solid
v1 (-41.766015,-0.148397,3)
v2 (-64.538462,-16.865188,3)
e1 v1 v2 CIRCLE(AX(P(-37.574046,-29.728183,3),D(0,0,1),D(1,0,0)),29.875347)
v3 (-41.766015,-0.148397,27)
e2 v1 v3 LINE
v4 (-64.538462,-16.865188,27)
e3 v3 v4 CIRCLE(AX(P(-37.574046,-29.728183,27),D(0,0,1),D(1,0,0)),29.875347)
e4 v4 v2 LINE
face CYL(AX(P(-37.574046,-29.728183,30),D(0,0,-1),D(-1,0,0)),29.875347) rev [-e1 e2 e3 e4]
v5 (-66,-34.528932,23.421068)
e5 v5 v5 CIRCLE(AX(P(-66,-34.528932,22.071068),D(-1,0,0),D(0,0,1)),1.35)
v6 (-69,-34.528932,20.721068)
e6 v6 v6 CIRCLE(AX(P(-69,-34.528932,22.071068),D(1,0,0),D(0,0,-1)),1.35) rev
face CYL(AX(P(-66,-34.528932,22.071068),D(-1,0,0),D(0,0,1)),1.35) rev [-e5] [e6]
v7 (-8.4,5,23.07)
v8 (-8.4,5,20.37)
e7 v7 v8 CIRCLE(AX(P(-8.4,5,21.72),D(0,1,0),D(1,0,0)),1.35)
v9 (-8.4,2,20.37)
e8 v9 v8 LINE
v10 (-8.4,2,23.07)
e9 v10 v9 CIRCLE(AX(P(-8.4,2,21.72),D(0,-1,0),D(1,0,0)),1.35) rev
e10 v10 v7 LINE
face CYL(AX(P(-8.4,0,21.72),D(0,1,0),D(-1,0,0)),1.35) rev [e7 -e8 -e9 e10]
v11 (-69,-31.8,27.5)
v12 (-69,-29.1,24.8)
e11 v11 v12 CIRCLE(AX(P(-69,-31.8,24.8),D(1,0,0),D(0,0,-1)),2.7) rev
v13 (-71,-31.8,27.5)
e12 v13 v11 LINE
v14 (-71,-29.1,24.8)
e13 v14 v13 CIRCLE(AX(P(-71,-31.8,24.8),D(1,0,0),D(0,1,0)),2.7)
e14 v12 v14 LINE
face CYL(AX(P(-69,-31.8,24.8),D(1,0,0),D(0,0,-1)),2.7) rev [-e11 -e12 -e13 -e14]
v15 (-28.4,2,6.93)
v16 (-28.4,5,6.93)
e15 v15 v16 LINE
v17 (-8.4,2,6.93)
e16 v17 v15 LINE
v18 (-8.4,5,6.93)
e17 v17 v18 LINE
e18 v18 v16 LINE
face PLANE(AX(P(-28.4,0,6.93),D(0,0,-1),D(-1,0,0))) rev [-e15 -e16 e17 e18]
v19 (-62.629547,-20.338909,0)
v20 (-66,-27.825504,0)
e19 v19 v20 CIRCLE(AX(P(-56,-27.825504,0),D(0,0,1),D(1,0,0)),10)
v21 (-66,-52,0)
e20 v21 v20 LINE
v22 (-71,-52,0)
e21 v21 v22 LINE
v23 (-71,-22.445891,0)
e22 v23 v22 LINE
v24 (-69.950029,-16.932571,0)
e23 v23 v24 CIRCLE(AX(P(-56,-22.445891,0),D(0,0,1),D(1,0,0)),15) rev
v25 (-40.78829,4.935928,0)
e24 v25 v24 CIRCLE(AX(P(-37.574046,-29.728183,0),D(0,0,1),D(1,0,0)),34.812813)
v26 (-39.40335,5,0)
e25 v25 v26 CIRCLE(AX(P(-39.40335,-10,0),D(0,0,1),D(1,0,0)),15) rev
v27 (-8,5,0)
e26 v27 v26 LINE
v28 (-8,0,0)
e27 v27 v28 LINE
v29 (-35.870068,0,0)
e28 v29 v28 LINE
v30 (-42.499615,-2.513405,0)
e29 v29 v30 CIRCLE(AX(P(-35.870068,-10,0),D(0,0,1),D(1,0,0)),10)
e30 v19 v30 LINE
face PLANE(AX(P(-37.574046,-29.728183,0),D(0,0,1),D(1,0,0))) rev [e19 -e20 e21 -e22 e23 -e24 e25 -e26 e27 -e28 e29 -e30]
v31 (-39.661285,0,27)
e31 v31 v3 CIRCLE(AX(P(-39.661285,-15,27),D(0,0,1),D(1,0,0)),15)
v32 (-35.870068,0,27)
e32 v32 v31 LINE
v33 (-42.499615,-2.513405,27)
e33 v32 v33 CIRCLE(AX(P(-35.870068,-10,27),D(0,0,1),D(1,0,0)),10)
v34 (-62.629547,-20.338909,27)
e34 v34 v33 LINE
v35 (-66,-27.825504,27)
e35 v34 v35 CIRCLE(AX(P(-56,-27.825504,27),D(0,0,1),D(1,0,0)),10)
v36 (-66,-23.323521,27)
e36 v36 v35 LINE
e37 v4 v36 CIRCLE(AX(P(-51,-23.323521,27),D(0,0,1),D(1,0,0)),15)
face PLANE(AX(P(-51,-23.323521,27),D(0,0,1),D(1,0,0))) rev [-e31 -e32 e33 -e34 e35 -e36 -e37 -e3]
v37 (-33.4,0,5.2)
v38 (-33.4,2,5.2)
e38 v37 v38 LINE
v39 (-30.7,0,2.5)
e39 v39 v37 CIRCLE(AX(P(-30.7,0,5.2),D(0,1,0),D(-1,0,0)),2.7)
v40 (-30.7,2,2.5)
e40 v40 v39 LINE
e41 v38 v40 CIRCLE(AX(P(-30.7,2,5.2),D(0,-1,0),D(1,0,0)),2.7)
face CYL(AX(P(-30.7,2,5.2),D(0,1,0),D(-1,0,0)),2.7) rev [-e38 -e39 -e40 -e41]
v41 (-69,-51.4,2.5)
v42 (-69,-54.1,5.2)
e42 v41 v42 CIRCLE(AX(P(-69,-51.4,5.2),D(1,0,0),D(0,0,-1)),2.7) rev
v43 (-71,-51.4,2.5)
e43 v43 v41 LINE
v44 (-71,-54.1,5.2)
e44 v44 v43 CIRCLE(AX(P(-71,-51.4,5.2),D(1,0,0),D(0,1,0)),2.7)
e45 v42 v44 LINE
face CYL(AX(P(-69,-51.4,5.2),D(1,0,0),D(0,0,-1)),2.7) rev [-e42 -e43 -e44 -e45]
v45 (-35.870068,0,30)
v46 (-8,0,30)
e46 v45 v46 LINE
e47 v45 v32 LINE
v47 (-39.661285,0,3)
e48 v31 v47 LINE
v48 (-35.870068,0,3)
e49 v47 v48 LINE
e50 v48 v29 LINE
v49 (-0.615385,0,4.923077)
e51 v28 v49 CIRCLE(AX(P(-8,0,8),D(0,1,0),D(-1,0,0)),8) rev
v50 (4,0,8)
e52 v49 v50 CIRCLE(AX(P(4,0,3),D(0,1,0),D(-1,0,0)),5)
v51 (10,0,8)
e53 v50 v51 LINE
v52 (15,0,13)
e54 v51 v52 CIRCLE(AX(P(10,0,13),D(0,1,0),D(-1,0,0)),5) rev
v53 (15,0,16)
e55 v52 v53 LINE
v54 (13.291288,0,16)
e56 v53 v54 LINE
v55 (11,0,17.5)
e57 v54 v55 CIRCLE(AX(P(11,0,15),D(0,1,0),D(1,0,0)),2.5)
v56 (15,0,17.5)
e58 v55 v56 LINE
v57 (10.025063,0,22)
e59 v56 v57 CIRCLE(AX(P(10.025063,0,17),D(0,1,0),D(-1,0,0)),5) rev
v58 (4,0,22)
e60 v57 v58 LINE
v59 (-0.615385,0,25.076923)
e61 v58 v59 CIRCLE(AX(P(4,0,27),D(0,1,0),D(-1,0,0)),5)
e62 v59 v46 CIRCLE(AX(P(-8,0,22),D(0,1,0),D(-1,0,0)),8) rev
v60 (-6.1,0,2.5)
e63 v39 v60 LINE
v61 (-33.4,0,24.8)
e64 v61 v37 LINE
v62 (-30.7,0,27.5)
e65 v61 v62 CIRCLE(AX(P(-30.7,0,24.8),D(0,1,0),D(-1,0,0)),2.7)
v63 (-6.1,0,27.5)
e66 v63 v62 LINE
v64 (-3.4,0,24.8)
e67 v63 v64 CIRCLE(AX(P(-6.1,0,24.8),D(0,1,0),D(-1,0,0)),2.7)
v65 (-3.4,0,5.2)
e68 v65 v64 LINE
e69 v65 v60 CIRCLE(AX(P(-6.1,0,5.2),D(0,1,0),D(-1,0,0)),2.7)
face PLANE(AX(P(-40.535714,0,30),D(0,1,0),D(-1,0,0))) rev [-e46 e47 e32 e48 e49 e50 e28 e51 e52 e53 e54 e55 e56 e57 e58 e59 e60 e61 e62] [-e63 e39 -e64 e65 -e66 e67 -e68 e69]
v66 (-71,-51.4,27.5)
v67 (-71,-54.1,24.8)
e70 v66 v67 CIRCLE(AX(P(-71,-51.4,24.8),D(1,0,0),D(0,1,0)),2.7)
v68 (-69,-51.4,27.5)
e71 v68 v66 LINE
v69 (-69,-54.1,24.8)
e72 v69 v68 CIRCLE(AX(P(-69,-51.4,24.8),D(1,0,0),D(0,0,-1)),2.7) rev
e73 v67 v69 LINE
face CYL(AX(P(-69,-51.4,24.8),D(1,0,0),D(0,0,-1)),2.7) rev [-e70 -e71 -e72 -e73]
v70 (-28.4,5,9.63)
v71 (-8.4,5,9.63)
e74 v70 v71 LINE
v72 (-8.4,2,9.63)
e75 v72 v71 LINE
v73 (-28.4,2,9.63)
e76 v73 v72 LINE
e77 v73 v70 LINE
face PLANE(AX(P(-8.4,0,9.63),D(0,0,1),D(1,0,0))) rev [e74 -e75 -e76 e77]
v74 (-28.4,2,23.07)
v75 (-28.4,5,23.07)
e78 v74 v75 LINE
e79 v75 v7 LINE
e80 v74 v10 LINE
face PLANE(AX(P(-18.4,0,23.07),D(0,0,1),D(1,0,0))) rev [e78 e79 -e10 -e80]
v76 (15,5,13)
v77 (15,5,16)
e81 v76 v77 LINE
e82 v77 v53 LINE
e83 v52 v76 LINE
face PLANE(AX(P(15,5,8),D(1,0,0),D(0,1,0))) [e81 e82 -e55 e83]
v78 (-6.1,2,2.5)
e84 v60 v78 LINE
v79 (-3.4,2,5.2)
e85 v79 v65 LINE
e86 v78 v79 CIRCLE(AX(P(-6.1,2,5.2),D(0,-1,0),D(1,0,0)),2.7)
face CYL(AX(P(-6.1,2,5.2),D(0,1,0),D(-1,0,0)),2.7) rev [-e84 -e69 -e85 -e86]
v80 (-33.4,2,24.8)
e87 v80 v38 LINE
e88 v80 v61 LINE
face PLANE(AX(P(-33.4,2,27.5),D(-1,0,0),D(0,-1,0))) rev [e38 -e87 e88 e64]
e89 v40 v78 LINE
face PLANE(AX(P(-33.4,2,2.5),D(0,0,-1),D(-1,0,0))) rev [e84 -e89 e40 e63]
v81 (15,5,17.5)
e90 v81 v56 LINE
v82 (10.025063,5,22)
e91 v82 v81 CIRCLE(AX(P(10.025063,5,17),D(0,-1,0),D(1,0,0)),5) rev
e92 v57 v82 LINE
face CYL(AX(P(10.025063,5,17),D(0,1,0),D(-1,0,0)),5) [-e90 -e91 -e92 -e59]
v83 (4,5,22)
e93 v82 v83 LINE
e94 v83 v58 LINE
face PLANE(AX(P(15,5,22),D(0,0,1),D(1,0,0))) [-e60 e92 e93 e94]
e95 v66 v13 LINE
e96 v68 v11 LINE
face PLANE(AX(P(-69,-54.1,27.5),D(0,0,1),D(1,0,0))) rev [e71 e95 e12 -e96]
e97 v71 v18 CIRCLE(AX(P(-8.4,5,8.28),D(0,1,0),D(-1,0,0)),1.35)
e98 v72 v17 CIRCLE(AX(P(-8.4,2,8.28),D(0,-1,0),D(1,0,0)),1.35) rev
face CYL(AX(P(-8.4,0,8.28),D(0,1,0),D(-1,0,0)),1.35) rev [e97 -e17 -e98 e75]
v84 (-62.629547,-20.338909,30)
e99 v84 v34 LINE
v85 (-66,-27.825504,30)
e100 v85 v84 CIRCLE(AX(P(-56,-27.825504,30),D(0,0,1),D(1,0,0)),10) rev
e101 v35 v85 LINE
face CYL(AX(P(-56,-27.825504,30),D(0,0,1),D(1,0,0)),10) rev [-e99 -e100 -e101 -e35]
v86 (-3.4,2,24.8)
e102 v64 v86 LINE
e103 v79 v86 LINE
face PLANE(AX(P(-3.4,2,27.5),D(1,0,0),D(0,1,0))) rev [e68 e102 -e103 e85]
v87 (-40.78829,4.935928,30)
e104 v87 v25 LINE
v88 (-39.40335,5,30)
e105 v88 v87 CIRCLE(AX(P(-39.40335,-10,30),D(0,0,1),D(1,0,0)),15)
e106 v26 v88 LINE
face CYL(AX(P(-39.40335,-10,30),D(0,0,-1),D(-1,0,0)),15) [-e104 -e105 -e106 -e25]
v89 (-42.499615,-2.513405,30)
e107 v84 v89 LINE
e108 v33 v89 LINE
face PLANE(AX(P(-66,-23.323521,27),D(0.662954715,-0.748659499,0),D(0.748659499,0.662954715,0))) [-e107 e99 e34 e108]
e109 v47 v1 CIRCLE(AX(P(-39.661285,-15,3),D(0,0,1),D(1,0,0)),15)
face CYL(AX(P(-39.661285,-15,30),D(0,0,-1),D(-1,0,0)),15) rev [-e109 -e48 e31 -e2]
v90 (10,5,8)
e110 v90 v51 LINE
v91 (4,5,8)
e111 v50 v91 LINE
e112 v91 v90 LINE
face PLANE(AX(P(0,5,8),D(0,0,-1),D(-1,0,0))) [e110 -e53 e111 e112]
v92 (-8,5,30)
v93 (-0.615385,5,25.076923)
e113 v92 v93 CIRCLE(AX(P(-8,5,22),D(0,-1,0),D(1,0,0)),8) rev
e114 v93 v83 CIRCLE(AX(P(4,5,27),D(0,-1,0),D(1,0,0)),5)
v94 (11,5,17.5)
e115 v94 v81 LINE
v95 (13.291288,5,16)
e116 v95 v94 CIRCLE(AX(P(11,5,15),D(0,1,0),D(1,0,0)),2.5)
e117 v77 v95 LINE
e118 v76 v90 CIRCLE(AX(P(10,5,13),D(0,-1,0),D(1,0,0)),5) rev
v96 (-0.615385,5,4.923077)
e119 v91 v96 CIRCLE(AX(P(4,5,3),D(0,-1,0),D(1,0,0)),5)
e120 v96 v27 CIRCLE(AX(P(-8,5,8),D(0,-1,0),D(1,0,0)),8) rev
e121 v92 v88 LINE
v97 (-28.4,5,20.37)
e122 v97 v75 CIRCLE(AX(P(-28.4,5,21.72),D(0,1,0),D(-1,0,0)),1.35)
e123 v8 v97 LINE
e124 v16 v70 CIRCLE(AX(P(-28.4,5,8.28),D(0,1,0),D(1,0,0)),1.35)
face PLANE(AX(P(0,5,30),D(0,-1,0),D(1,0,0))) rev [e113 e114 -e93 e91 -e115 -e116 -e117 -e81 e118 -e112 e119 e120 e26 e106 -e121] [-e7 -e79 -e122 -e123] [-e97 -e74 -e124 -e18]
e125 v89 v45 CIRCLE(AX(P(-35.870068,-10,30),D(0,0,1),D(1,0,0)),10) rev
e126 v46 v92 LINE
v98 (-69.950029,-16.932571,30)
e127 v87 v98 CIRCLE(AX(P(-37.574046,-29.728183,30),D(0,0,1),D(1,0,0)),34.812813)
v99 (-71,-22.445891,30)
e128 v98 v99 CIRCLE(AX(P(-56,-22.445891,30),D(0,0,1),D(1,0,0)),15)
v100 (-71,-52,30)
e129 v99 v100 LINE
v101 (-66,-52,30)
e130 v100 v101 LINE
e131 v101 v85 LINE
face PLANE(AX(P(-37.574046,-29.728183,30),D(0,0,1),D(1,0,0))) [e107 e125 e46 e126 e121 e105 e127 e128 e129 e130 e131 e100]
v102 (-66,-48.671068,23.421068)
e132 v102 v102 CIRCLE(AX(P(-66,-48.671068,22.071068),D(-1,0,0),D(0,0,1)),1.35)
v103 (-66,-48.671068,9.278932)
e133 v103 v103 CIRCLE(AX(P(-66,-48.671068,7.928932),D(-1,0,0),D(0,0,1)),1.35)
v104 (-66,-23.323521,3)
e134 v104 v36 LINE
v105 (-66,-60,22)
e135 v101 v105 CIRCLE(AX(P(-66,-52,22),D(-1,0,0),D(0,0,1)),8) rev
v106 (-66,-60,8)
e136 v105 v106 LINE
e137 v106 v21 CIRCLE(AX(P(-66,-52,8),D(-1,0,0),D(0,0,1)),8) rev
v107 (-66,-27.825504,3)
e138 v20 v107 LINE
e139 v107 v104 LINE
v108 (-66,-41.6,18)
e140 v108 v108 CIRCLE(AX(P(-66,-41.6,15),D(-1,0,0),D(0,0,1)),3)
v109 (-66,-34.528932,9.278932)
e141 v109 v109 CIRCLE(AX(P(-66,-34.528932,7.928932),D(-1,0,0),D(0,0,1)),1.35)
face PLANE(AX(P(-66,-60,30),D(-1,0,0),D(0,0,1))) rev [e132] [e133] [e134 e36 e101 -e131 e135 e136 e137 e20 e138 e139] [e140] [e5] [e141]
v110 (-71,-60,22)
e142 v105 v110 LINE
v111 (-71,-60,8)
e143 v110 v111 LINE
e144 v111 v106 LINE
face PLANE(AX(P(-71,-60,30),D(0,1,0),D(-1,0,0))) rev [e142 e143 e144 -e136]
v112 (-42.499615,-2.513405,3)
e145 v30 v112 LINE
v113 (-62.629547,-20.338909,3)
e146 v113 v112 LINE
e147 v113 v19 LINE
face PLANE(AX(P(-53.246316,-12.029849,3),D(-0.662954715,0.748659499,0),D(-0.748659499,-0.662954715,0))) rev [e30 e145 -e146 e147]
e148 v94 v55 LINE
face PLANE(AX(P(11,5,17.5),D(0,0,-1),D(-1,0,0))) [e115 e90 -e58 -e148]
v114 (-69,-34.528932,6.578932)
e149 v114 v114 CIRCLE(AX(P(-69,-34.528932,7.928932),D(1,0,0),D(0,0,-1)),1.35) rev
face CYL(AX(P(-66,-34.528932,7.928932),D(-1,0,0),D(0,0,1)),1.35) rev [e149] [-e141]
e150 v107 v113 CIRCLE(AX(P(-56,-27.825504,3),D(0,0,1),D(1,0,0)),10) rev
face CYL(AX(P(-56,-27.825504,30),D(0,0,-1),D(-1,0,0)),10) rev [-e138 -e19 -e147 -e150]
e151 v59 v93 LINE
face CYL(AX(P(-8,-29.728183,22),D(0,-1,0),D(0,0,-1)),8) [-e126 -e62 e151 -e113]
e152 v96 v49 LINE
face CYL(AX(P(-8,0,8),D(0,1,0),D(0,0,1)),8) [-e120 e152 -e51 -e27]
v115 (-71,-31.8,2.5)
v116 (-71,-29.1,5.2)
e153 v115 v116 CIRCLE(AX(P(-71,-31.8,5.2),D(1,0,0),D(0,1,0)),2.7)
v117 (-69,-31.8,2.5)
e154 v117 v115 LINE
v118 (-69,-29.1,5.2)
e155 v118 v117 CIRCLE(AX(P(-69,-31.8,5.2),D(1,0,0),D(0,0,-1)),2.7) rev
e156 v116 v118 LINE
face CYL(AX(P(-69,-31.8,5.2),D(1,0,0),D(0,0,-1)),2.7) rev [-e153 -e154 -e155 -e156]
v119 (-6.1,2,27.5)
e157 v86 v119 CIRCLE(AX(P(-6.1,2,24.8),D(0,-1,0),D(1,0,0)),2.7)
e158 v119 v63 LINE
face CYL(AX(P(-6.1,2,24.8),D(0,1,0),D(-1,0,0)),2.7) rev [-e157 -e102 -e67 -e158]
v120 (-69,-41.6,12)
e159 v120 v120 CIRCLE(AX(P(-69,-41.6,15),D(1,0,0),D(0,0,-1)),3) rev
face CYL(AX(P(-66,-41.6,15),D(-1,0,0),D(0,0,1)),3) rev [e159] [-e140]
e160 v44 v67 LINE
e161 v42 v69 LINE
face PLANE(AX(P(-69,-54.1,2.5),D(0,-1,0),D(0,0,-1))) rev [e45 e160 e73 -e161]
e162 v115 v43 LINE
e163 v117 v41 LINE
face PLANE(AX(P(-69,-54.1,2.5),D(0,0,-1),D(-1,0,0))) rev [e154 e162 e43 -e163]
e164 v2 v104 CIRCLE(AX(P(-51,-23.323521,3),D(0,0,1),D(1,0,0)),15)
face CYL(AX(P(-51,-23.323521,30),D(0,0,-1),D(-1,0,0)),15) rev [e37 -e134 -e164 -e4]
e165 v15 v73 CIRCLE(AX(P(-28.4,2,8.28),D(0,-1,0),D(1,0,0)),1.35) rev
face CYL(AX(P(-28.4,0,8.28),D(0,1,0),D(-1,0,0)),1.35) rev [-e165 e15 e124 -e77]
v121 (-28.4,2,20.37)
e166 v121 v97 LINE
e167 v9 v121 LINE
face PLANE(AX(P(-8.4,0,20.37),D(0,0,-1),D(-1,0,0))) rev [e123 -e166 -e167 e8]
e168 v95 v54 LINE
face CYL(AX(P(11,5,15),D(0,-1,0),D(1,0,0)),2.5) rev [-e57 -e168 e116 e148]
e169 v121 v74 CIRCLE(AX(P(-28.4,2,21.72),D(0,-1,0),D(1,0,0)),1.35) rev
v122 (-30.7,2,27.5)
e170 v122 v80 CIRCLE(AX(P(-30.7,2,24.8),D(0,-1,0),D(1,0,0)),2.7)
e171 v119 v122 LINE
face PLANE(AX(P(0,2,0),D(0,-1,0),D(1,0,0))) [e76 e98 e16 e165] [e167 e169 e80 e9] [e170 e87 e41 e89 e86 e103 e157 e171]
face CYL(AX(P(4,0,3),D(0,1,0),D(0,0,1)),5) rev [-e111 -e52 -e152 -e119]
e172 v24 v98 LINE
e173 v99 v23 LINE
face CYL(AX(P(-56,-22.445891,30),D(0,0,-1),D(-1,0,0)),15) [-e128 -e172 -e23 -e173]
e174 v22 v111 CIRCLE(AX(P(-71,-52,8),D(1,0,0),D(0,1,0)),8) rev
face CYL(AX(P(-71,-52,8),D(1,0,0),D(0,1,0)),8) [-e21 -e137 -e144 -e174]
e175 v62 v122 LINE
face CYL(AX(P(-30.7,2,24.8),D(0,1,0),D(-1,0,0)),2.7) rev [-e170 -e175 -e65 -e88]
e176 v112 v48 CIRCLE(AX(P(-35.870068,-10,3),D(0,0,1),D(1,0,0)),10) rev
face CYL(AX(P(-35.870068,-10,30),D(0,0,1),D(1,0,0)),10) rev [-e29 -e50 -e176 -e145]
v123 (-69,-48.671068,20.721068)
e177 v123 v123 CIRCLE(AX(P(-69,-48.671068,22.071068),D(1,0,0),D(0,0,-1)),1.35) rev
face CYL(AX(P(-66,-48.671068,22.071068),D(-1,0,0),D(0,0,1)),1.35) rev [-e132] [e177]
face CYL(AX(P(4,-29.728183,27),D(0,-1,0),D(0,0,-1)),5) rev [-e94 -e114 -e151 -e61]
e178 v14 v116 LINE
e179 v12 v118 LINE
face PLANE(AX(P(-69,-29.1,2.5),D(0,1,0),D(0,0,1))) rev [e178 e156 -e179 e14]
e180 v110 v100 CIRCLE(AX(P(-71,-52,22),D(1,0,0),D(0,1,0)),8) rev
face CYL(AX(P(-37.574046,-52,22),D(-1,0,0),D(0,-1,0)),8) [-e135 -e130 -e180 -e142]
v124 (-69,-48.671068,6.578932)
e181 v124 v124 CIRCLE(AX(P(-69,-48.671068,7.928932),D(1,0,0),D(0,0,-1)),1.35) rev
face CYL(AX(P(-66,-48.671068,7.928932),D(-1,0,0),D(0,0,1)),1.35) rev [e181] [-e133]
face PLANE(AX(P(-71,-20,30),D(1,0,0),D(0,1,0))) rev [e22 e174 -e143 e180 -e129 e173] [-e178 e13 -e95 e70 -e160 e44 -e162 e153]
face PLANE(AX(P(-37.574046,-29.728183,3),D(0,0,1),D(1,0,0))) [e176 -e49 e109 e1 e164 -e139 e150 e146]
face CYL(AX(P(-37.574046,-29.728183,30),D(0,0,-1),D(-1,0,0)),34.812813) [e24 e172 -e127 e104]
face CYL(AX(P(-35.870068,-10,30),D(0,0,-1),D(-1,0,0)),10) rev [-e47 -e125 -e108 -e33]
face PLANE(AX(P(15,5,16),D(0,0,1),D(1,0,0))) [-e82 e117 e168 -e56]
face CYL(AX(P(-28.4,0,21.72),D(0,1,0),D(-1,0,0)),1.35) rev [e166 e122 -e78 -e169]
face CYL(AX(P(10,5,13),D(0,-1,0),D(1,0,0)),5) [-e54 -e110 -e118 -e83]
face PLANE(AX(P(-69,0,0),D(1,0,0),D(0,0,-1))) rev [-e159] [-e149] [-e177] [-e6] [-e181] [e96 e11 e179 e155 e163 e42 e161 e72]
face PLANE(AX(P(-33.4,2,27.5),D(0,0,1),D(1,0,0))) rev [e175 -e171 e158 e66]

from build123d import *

# Parameters (mm, degrees)
SALIENTE_EXTRUIR1_DEPTH = 30
CORTAR_EXTRUIR1_DEPTH   = 5
CROQUIS3_W              = 30
CROQUIS3_H              = 25
CORTAR_EXTRUIR2_DEPTH   = 2
CROQUIS4_R              = 1.35
CROQUIS4_R_2            = 3
CORTAR_EXTRUIR3_DEPTH   = 5
CROQUIS5_W              = 25
CROQUIS5_H              = 25
CORTAR_EXTRUIR4_DEPTH   = 2
REDONDEO1_R             = 15
REDONDEO2_R             = 8
REDONDEO3_R             = 2.7
SALIENTE_EXTRUIR2_DEPTH = 5
REDONDEO4_R             = 5
SALIENTE_EXTRUIR3_START = -3
SALIENTE_EXTRUIR3_DEPTH = 3
SALIENTE_EXTRUIR4_START = -30
SALIENTE_EXTRUIR4_DEPTH = 3
REDONDEO5_R             = 10


with BuildPart() as part:
    # Croquis1 → Saliente-Extruir1 (new body)
    with BuildSketch(Plane.XY):
        with BuildLine():
            Line((0, 0), (0, 5))
            Line((0, 5), (-40, 5))
            ThreePointArc((-40, 5), (-59.427874629, -2.62943546), (-71, -20))
            Line((-71, -20), (-71, -60))
            Line((-71, -60), (-66, -60))
            Line((-66, -60), (-66, -20.535714286))
            ThreePointArc((-66, -20.535714286), (-56.328368106, -6.472823549), (-40.535714286, 0))
            Line((-40.535714286, 0), (0, 0))
        make_face()
    extrude(amount=SALIENTE_EXTRUIR1_DEPTH)

    # Croquis2 → Cortar-Extruir1 (cut)
    with BuildSketch(Plane(origin=(0, 5, 0), x_dir=(1, 0, 0), z_dir=(0, 1, 0))):
        with BuildLine():
            Line((-18.4, -6.93), (-8.4, -6.93))
            ThreePointArc((-8.4, -6.93), (-7.05, -8.28), (-8.4, -9.63))
            Line((-8.4, -9.63), (-28.4, -9.63))
            ThreePointArc((-28.4, -9.63), (-29.75, -8.28), (-28.4, -6.93))
            Line((-28.4, -6.93), (-18.4, -6.93))
        make_face()
        with BuildLine():
            Line((-8.4, -20.37), (-28.4, -20.37))
            ThreePointArc((-28.4, -20.37), (-29.75, -21.72), (-28.4, -23.07))
            Line((-28.4, -23.07), (-18.4, -23.07))
            Line((-18.4, -23.07), (-8.4, -23.07))
            ThreePointArc((-8.4, -23.07), (-7.05, -21.72), (-8.4, -20.37))
        make_face()
    extrude(amount=-CORTAR_EXTRUIR1_DEPTH, mode=Mode.SUBTRACT)

    # Croquis3 → Cortar-Extruir2 (cut)
    with BuildSketch(Plane.XZ):
        with Locations((-18.4, 15)):
            Rectangle(CROQUIS3_W, CROQUIS3_H)
    extrude(amount=-CORTAR_EXTRUIR2_DEPTH, mode=Mode.SUBTRACT)

    # Croquis4 → Cortar-Extruir3 (cut)
    with BuildSketch(Plane.ZY.offset(71)):
        with Locations((22.071067812, -34.528932188)):
            Circle(CROQUIS4_R)
        with Locations((22.071067812, -48.671067812)):
            Circle(CROQUIS4_R)
        with Locations((7.928932188, -48.671067812)):
            Circle(CROQUIS4_R)
        with Locations((7.928932188, -34.528932188)):
            Circle(CROQUIS4_R)
        with Locations((15, -41.6)):
            Circle(CROQUIS4_R_2)
    extrude(amount=-CORTAR_EXTRUIR3_DEPTH, mode=Mode.SUBTRACT)

    # Croquis5 → Cortar-Extruir4 (cut)
    with BuildSketch(Plane.ZY.offset(71)):
        with Locations((15, -41.6)):
            Rectangle(CROQUIS5_W, CROQUIS5_H)
    extrude(amount=-CORTAR_EXTRUIR4_DEPTH, mode=Mode.SUBTRACT)

    # Redondeo1
    # the kernel refuses this fillet: 15 mm, written as the material it adds along each edge
    with BuildSketch(Plane(origin=(-40.535714286, 0, 0), x_dir=(-0.9928040160487852, -0.11975051447657076, 0), z_dir=(0, 0, 1))) as redondeo1_piece_1:
        with BuildLine():
            CenterArc((0.928120739, 14.996773606), REDONDEO1_R, 263.122295715, 8.066092884)
            Line((-0.868136978, 0.104713365), (0, 0))
            ThreePointArc((0, 0), (0.61960892, -0.006425976), (1.23921784, 0))
        make_face()
    extrude(amount=30)
    with BuildSketch(Plane(origin=(-66, -20.535714286, 0), x_dir=(0, -1, 0), z_dir=(0, 0, 1))) as redondeo1_piece_2:
        with BuildLine():
            CenterArc((2.787806423, 15), REDONDEO1_R, 244.497181261, 25.502818739)
            ThreePointArc((-3.670526079, 1.461538444), (-1.859449277, 0.670027601), (0, 0))
            Line((0, 0), (2.787806423, 0))
        make_face()
    extrude(amount=30)
    # the kernel refuses this fillet: 15 mm, written as the material it takes off along each edge
    with BuildSketch(Plane(origin=(-71, -20, -8.10538424), x_dir=(0, -1, 0), z_dir=(0, 0, 1))) as redondeo1_2_piece_1:
        with BuildLine():
            CenterArc((2.445891068, 15), REDONDEO1_R, 248.435113489, 21.564886511)
            ThreePointArc((-3.067429039, 1.049971276), (-1.545944268, 0.48925715), (0, 0))
            Line((0, 0), (2.445891068, 0))
        make_face()
    extrude(amount=46.210768479, mode=Mode.SUBTRACT)
    with BuildSketch(Plane(origin=(-40, 5, -1.977224952), x_dir=(-0.9967130662310812, -0.08101273729628075, 0), z_dir=(0, 0, 1))) as redondeo1_2_piece_2:
        with BuildLine():
            CenterArc((0.620502289, 14.999032237), REDONDEO1_R, 265.35321973, 5.297627307)
            Line((-0.59468877, 0.048336243), (0, 0))
            ThreePointArc((0, 0), (0.39544499, -0.002246038), (0.790889981, 0))
        make_face()
    extrude(amount=33.954449904, mode=Mode.SUBTRACT)

    # Redondeo2
    redondeo2_edges = [part.edges().sort_by_distance(p)[0] for p in [
        (0, 2.5, 0),
        (-68.5, -60, 30),
        (0, 2.5, 30),
        (-68.5, -60, 0),
    ]]
    fillet(redondeo2_edges, radius=REDONDEO2_R)

    # Redondeo3
    redondeo3_edges = [part.edges().sort_by_distance(p)[0] for p in [
        (-70, -29.1, 27.5),
        (-70, -54.1, 27.5),
        (-70, -54.1, 2.5),
        (-70, -29.1, 2.5),
        (-3.4, 1, 27.5),
        (-3.4, 1, 2.5),
        (-33.4, 1, 2.5),
        (-33.4, 1, 27.5),
    ]]
    fillet(redondeo3_edges, radius=REDONDEO3_R)

    # Croquis6 → Saliente-Extruir2 (add)
    with BuildSketch(Plane.XZ):
        with BuildLine():
            Line((0, 22), (0, 8))
            Line((0, 8), (15, 8))
            Line((15, 8), (15, 16))
            Line((15, 16), (13.291287847, 16))
            ThreePointArc((13.291287847, 16), (9.630693606, 12.908349934), (11, 17.5))
            Line((11, 17.5), (15, 17.5))
            Line((15, 17.5), (15, 22))
            Line((15, 22), (0, 22))
        make_face()
    extrude(amount=-SALIENTE_EXTRUIR2_DEPTH)

    # Redondeo4
    # the kernel refuses this fillet: 5 mm, written as the material it adds along each edge
    with BuildSketch(Plane(origin=(0, 0, 22), x_dir=(-0.19611613513818366, 0, 0.9805806756909203), z_dir=(0, 1, 0))) as redondeo4_piece_1:
        with BuildLine():
            CenterArc((4.118438838, 4.902903378), REDONDEO4_R, 191.309932474, 67.380135052)
            Line((-0.784464541, 3.922322703), (0, 0))
            ThreePointArc((0, 0), (1.568929081, 0.155354594), (3.137858162, 0))
        make_face()
    extrude(amount=5)
    with BuildSketch(Plane(origin=(0, 0, 8), x_dir=(-0.19611613513818402, 0, -0.9805806756909201), z_dir=(0, 1, 0))) as redondeo4_piece_2:
        with BuildLine():
            CenterArc((4.118438838, -4.902903378), REDONDEO4_R, 101.309932474, 67.380135052)
            Line((-0.784464541, -3.922322703), (0, 0))
            ThreePointArc((0, 0), (1.568929081, -0.155354594), (3.137858162, 0))
        make_face()
    extrude(amount=5)
    # the kernel refuses this fillet: 5 mm, written as the material it takes off along each edge
    with BuildSketch(Plane(origin=(15, -12.437342964, 22), x_dir=(-1, 0, 0), z_dir=(0, 1, 0))) as redondeo4_2_piece_1:
        with BuildLine():
            CenterArc((4.974937186, -5), REDONDEO4_R, 90, 84.260829523)
            Line((0, -4.5), (0, 0))
            Line((0, 0), (4.974937186, 0))
        make_face()
    extrude(amount=29.874685928, mode=Mode.SUBTRACT)
    with BuildSketch(Plane(origin=(15, -12.5, 8), x_dir=(0, 0, 1), z_dir=(0, 1, 0))) as redondeo4_2_piece_2:
        with BuildLine():
            CenterArc((REDONDEO4_R, -REDONDEO4_R), REDONDEO4_R, 90, 90)
            Line((0, -REDONDEO4_R), (0, 0))
            Line((0, 0), (REDONDEO4_R, 0))
        make_face()
    extrude(amount=30, mode=Mode.SUBTRACT)

    # Croquis9 → Saliente-Extruir3 (add)
    with BuildSketch(Plane.XY.offset(30).offset(SALIENTE_EXTRUIR3_START)):
        with BuildLine():
            Line((-66, -23.323520708), (-39.661284928, 0))
            ThreePointArc((-39.661284928, 0), (-40.716262324, -0.037145236), (-41.766014734, -0.148396974))
            ThreePointArc((-41.766014734, -0.148396974), (-55.25292739, -5.645128922), (-64.538461556, -16.865188206))
            ThreePointArc((-64.538461556, -16.865188206), (-65.630053372, -20.01269931), (-66, -23.323520708))
        make_face()
    extrude(amount=SALIENTE_EXTRUIR3_DEPTH)

    # Croquis9<2> → Saliente-Extruir4 (add)
    with BuildSketch(Plane.XY.offset(30).offset(SALIENTE_EXTRUIR4_START)):
        with BuildLine():
            Line((-66, -23.323520708), (-39.661284928, 0))
            ThreePointArc((-39.661284928, 0), (-40.716262324, -0.037145236), (-41.766014734, -0.148396974))
            ThreePointArc((-41.766014734, -0.148396974), (-55.25292739, -5.645128922), (-64.538461556, -16.865188206))
            ThreePointArc((-64.538461556, -16.865188206), (-65.630053372, -20.01269931), (-66, -23.323520708))
        make_face()
    extrude(amount=SALIENTE_EXTRUIR4_DEPTH)

    # Redondeo5
    redondeo5_edges = [part.edges().sort_by_distance(p)[0] for p in [
        (-39.661284928, 0, 28.5),
        (-66, -23.323520708, 1.5),
        (-66, -23.323520708, 28.5),
        (-39.661284928, 0, 1.5),
    ]]
    fillet(redondeo5_edges, radius=REDONDEO5_R)


solid = part.part
